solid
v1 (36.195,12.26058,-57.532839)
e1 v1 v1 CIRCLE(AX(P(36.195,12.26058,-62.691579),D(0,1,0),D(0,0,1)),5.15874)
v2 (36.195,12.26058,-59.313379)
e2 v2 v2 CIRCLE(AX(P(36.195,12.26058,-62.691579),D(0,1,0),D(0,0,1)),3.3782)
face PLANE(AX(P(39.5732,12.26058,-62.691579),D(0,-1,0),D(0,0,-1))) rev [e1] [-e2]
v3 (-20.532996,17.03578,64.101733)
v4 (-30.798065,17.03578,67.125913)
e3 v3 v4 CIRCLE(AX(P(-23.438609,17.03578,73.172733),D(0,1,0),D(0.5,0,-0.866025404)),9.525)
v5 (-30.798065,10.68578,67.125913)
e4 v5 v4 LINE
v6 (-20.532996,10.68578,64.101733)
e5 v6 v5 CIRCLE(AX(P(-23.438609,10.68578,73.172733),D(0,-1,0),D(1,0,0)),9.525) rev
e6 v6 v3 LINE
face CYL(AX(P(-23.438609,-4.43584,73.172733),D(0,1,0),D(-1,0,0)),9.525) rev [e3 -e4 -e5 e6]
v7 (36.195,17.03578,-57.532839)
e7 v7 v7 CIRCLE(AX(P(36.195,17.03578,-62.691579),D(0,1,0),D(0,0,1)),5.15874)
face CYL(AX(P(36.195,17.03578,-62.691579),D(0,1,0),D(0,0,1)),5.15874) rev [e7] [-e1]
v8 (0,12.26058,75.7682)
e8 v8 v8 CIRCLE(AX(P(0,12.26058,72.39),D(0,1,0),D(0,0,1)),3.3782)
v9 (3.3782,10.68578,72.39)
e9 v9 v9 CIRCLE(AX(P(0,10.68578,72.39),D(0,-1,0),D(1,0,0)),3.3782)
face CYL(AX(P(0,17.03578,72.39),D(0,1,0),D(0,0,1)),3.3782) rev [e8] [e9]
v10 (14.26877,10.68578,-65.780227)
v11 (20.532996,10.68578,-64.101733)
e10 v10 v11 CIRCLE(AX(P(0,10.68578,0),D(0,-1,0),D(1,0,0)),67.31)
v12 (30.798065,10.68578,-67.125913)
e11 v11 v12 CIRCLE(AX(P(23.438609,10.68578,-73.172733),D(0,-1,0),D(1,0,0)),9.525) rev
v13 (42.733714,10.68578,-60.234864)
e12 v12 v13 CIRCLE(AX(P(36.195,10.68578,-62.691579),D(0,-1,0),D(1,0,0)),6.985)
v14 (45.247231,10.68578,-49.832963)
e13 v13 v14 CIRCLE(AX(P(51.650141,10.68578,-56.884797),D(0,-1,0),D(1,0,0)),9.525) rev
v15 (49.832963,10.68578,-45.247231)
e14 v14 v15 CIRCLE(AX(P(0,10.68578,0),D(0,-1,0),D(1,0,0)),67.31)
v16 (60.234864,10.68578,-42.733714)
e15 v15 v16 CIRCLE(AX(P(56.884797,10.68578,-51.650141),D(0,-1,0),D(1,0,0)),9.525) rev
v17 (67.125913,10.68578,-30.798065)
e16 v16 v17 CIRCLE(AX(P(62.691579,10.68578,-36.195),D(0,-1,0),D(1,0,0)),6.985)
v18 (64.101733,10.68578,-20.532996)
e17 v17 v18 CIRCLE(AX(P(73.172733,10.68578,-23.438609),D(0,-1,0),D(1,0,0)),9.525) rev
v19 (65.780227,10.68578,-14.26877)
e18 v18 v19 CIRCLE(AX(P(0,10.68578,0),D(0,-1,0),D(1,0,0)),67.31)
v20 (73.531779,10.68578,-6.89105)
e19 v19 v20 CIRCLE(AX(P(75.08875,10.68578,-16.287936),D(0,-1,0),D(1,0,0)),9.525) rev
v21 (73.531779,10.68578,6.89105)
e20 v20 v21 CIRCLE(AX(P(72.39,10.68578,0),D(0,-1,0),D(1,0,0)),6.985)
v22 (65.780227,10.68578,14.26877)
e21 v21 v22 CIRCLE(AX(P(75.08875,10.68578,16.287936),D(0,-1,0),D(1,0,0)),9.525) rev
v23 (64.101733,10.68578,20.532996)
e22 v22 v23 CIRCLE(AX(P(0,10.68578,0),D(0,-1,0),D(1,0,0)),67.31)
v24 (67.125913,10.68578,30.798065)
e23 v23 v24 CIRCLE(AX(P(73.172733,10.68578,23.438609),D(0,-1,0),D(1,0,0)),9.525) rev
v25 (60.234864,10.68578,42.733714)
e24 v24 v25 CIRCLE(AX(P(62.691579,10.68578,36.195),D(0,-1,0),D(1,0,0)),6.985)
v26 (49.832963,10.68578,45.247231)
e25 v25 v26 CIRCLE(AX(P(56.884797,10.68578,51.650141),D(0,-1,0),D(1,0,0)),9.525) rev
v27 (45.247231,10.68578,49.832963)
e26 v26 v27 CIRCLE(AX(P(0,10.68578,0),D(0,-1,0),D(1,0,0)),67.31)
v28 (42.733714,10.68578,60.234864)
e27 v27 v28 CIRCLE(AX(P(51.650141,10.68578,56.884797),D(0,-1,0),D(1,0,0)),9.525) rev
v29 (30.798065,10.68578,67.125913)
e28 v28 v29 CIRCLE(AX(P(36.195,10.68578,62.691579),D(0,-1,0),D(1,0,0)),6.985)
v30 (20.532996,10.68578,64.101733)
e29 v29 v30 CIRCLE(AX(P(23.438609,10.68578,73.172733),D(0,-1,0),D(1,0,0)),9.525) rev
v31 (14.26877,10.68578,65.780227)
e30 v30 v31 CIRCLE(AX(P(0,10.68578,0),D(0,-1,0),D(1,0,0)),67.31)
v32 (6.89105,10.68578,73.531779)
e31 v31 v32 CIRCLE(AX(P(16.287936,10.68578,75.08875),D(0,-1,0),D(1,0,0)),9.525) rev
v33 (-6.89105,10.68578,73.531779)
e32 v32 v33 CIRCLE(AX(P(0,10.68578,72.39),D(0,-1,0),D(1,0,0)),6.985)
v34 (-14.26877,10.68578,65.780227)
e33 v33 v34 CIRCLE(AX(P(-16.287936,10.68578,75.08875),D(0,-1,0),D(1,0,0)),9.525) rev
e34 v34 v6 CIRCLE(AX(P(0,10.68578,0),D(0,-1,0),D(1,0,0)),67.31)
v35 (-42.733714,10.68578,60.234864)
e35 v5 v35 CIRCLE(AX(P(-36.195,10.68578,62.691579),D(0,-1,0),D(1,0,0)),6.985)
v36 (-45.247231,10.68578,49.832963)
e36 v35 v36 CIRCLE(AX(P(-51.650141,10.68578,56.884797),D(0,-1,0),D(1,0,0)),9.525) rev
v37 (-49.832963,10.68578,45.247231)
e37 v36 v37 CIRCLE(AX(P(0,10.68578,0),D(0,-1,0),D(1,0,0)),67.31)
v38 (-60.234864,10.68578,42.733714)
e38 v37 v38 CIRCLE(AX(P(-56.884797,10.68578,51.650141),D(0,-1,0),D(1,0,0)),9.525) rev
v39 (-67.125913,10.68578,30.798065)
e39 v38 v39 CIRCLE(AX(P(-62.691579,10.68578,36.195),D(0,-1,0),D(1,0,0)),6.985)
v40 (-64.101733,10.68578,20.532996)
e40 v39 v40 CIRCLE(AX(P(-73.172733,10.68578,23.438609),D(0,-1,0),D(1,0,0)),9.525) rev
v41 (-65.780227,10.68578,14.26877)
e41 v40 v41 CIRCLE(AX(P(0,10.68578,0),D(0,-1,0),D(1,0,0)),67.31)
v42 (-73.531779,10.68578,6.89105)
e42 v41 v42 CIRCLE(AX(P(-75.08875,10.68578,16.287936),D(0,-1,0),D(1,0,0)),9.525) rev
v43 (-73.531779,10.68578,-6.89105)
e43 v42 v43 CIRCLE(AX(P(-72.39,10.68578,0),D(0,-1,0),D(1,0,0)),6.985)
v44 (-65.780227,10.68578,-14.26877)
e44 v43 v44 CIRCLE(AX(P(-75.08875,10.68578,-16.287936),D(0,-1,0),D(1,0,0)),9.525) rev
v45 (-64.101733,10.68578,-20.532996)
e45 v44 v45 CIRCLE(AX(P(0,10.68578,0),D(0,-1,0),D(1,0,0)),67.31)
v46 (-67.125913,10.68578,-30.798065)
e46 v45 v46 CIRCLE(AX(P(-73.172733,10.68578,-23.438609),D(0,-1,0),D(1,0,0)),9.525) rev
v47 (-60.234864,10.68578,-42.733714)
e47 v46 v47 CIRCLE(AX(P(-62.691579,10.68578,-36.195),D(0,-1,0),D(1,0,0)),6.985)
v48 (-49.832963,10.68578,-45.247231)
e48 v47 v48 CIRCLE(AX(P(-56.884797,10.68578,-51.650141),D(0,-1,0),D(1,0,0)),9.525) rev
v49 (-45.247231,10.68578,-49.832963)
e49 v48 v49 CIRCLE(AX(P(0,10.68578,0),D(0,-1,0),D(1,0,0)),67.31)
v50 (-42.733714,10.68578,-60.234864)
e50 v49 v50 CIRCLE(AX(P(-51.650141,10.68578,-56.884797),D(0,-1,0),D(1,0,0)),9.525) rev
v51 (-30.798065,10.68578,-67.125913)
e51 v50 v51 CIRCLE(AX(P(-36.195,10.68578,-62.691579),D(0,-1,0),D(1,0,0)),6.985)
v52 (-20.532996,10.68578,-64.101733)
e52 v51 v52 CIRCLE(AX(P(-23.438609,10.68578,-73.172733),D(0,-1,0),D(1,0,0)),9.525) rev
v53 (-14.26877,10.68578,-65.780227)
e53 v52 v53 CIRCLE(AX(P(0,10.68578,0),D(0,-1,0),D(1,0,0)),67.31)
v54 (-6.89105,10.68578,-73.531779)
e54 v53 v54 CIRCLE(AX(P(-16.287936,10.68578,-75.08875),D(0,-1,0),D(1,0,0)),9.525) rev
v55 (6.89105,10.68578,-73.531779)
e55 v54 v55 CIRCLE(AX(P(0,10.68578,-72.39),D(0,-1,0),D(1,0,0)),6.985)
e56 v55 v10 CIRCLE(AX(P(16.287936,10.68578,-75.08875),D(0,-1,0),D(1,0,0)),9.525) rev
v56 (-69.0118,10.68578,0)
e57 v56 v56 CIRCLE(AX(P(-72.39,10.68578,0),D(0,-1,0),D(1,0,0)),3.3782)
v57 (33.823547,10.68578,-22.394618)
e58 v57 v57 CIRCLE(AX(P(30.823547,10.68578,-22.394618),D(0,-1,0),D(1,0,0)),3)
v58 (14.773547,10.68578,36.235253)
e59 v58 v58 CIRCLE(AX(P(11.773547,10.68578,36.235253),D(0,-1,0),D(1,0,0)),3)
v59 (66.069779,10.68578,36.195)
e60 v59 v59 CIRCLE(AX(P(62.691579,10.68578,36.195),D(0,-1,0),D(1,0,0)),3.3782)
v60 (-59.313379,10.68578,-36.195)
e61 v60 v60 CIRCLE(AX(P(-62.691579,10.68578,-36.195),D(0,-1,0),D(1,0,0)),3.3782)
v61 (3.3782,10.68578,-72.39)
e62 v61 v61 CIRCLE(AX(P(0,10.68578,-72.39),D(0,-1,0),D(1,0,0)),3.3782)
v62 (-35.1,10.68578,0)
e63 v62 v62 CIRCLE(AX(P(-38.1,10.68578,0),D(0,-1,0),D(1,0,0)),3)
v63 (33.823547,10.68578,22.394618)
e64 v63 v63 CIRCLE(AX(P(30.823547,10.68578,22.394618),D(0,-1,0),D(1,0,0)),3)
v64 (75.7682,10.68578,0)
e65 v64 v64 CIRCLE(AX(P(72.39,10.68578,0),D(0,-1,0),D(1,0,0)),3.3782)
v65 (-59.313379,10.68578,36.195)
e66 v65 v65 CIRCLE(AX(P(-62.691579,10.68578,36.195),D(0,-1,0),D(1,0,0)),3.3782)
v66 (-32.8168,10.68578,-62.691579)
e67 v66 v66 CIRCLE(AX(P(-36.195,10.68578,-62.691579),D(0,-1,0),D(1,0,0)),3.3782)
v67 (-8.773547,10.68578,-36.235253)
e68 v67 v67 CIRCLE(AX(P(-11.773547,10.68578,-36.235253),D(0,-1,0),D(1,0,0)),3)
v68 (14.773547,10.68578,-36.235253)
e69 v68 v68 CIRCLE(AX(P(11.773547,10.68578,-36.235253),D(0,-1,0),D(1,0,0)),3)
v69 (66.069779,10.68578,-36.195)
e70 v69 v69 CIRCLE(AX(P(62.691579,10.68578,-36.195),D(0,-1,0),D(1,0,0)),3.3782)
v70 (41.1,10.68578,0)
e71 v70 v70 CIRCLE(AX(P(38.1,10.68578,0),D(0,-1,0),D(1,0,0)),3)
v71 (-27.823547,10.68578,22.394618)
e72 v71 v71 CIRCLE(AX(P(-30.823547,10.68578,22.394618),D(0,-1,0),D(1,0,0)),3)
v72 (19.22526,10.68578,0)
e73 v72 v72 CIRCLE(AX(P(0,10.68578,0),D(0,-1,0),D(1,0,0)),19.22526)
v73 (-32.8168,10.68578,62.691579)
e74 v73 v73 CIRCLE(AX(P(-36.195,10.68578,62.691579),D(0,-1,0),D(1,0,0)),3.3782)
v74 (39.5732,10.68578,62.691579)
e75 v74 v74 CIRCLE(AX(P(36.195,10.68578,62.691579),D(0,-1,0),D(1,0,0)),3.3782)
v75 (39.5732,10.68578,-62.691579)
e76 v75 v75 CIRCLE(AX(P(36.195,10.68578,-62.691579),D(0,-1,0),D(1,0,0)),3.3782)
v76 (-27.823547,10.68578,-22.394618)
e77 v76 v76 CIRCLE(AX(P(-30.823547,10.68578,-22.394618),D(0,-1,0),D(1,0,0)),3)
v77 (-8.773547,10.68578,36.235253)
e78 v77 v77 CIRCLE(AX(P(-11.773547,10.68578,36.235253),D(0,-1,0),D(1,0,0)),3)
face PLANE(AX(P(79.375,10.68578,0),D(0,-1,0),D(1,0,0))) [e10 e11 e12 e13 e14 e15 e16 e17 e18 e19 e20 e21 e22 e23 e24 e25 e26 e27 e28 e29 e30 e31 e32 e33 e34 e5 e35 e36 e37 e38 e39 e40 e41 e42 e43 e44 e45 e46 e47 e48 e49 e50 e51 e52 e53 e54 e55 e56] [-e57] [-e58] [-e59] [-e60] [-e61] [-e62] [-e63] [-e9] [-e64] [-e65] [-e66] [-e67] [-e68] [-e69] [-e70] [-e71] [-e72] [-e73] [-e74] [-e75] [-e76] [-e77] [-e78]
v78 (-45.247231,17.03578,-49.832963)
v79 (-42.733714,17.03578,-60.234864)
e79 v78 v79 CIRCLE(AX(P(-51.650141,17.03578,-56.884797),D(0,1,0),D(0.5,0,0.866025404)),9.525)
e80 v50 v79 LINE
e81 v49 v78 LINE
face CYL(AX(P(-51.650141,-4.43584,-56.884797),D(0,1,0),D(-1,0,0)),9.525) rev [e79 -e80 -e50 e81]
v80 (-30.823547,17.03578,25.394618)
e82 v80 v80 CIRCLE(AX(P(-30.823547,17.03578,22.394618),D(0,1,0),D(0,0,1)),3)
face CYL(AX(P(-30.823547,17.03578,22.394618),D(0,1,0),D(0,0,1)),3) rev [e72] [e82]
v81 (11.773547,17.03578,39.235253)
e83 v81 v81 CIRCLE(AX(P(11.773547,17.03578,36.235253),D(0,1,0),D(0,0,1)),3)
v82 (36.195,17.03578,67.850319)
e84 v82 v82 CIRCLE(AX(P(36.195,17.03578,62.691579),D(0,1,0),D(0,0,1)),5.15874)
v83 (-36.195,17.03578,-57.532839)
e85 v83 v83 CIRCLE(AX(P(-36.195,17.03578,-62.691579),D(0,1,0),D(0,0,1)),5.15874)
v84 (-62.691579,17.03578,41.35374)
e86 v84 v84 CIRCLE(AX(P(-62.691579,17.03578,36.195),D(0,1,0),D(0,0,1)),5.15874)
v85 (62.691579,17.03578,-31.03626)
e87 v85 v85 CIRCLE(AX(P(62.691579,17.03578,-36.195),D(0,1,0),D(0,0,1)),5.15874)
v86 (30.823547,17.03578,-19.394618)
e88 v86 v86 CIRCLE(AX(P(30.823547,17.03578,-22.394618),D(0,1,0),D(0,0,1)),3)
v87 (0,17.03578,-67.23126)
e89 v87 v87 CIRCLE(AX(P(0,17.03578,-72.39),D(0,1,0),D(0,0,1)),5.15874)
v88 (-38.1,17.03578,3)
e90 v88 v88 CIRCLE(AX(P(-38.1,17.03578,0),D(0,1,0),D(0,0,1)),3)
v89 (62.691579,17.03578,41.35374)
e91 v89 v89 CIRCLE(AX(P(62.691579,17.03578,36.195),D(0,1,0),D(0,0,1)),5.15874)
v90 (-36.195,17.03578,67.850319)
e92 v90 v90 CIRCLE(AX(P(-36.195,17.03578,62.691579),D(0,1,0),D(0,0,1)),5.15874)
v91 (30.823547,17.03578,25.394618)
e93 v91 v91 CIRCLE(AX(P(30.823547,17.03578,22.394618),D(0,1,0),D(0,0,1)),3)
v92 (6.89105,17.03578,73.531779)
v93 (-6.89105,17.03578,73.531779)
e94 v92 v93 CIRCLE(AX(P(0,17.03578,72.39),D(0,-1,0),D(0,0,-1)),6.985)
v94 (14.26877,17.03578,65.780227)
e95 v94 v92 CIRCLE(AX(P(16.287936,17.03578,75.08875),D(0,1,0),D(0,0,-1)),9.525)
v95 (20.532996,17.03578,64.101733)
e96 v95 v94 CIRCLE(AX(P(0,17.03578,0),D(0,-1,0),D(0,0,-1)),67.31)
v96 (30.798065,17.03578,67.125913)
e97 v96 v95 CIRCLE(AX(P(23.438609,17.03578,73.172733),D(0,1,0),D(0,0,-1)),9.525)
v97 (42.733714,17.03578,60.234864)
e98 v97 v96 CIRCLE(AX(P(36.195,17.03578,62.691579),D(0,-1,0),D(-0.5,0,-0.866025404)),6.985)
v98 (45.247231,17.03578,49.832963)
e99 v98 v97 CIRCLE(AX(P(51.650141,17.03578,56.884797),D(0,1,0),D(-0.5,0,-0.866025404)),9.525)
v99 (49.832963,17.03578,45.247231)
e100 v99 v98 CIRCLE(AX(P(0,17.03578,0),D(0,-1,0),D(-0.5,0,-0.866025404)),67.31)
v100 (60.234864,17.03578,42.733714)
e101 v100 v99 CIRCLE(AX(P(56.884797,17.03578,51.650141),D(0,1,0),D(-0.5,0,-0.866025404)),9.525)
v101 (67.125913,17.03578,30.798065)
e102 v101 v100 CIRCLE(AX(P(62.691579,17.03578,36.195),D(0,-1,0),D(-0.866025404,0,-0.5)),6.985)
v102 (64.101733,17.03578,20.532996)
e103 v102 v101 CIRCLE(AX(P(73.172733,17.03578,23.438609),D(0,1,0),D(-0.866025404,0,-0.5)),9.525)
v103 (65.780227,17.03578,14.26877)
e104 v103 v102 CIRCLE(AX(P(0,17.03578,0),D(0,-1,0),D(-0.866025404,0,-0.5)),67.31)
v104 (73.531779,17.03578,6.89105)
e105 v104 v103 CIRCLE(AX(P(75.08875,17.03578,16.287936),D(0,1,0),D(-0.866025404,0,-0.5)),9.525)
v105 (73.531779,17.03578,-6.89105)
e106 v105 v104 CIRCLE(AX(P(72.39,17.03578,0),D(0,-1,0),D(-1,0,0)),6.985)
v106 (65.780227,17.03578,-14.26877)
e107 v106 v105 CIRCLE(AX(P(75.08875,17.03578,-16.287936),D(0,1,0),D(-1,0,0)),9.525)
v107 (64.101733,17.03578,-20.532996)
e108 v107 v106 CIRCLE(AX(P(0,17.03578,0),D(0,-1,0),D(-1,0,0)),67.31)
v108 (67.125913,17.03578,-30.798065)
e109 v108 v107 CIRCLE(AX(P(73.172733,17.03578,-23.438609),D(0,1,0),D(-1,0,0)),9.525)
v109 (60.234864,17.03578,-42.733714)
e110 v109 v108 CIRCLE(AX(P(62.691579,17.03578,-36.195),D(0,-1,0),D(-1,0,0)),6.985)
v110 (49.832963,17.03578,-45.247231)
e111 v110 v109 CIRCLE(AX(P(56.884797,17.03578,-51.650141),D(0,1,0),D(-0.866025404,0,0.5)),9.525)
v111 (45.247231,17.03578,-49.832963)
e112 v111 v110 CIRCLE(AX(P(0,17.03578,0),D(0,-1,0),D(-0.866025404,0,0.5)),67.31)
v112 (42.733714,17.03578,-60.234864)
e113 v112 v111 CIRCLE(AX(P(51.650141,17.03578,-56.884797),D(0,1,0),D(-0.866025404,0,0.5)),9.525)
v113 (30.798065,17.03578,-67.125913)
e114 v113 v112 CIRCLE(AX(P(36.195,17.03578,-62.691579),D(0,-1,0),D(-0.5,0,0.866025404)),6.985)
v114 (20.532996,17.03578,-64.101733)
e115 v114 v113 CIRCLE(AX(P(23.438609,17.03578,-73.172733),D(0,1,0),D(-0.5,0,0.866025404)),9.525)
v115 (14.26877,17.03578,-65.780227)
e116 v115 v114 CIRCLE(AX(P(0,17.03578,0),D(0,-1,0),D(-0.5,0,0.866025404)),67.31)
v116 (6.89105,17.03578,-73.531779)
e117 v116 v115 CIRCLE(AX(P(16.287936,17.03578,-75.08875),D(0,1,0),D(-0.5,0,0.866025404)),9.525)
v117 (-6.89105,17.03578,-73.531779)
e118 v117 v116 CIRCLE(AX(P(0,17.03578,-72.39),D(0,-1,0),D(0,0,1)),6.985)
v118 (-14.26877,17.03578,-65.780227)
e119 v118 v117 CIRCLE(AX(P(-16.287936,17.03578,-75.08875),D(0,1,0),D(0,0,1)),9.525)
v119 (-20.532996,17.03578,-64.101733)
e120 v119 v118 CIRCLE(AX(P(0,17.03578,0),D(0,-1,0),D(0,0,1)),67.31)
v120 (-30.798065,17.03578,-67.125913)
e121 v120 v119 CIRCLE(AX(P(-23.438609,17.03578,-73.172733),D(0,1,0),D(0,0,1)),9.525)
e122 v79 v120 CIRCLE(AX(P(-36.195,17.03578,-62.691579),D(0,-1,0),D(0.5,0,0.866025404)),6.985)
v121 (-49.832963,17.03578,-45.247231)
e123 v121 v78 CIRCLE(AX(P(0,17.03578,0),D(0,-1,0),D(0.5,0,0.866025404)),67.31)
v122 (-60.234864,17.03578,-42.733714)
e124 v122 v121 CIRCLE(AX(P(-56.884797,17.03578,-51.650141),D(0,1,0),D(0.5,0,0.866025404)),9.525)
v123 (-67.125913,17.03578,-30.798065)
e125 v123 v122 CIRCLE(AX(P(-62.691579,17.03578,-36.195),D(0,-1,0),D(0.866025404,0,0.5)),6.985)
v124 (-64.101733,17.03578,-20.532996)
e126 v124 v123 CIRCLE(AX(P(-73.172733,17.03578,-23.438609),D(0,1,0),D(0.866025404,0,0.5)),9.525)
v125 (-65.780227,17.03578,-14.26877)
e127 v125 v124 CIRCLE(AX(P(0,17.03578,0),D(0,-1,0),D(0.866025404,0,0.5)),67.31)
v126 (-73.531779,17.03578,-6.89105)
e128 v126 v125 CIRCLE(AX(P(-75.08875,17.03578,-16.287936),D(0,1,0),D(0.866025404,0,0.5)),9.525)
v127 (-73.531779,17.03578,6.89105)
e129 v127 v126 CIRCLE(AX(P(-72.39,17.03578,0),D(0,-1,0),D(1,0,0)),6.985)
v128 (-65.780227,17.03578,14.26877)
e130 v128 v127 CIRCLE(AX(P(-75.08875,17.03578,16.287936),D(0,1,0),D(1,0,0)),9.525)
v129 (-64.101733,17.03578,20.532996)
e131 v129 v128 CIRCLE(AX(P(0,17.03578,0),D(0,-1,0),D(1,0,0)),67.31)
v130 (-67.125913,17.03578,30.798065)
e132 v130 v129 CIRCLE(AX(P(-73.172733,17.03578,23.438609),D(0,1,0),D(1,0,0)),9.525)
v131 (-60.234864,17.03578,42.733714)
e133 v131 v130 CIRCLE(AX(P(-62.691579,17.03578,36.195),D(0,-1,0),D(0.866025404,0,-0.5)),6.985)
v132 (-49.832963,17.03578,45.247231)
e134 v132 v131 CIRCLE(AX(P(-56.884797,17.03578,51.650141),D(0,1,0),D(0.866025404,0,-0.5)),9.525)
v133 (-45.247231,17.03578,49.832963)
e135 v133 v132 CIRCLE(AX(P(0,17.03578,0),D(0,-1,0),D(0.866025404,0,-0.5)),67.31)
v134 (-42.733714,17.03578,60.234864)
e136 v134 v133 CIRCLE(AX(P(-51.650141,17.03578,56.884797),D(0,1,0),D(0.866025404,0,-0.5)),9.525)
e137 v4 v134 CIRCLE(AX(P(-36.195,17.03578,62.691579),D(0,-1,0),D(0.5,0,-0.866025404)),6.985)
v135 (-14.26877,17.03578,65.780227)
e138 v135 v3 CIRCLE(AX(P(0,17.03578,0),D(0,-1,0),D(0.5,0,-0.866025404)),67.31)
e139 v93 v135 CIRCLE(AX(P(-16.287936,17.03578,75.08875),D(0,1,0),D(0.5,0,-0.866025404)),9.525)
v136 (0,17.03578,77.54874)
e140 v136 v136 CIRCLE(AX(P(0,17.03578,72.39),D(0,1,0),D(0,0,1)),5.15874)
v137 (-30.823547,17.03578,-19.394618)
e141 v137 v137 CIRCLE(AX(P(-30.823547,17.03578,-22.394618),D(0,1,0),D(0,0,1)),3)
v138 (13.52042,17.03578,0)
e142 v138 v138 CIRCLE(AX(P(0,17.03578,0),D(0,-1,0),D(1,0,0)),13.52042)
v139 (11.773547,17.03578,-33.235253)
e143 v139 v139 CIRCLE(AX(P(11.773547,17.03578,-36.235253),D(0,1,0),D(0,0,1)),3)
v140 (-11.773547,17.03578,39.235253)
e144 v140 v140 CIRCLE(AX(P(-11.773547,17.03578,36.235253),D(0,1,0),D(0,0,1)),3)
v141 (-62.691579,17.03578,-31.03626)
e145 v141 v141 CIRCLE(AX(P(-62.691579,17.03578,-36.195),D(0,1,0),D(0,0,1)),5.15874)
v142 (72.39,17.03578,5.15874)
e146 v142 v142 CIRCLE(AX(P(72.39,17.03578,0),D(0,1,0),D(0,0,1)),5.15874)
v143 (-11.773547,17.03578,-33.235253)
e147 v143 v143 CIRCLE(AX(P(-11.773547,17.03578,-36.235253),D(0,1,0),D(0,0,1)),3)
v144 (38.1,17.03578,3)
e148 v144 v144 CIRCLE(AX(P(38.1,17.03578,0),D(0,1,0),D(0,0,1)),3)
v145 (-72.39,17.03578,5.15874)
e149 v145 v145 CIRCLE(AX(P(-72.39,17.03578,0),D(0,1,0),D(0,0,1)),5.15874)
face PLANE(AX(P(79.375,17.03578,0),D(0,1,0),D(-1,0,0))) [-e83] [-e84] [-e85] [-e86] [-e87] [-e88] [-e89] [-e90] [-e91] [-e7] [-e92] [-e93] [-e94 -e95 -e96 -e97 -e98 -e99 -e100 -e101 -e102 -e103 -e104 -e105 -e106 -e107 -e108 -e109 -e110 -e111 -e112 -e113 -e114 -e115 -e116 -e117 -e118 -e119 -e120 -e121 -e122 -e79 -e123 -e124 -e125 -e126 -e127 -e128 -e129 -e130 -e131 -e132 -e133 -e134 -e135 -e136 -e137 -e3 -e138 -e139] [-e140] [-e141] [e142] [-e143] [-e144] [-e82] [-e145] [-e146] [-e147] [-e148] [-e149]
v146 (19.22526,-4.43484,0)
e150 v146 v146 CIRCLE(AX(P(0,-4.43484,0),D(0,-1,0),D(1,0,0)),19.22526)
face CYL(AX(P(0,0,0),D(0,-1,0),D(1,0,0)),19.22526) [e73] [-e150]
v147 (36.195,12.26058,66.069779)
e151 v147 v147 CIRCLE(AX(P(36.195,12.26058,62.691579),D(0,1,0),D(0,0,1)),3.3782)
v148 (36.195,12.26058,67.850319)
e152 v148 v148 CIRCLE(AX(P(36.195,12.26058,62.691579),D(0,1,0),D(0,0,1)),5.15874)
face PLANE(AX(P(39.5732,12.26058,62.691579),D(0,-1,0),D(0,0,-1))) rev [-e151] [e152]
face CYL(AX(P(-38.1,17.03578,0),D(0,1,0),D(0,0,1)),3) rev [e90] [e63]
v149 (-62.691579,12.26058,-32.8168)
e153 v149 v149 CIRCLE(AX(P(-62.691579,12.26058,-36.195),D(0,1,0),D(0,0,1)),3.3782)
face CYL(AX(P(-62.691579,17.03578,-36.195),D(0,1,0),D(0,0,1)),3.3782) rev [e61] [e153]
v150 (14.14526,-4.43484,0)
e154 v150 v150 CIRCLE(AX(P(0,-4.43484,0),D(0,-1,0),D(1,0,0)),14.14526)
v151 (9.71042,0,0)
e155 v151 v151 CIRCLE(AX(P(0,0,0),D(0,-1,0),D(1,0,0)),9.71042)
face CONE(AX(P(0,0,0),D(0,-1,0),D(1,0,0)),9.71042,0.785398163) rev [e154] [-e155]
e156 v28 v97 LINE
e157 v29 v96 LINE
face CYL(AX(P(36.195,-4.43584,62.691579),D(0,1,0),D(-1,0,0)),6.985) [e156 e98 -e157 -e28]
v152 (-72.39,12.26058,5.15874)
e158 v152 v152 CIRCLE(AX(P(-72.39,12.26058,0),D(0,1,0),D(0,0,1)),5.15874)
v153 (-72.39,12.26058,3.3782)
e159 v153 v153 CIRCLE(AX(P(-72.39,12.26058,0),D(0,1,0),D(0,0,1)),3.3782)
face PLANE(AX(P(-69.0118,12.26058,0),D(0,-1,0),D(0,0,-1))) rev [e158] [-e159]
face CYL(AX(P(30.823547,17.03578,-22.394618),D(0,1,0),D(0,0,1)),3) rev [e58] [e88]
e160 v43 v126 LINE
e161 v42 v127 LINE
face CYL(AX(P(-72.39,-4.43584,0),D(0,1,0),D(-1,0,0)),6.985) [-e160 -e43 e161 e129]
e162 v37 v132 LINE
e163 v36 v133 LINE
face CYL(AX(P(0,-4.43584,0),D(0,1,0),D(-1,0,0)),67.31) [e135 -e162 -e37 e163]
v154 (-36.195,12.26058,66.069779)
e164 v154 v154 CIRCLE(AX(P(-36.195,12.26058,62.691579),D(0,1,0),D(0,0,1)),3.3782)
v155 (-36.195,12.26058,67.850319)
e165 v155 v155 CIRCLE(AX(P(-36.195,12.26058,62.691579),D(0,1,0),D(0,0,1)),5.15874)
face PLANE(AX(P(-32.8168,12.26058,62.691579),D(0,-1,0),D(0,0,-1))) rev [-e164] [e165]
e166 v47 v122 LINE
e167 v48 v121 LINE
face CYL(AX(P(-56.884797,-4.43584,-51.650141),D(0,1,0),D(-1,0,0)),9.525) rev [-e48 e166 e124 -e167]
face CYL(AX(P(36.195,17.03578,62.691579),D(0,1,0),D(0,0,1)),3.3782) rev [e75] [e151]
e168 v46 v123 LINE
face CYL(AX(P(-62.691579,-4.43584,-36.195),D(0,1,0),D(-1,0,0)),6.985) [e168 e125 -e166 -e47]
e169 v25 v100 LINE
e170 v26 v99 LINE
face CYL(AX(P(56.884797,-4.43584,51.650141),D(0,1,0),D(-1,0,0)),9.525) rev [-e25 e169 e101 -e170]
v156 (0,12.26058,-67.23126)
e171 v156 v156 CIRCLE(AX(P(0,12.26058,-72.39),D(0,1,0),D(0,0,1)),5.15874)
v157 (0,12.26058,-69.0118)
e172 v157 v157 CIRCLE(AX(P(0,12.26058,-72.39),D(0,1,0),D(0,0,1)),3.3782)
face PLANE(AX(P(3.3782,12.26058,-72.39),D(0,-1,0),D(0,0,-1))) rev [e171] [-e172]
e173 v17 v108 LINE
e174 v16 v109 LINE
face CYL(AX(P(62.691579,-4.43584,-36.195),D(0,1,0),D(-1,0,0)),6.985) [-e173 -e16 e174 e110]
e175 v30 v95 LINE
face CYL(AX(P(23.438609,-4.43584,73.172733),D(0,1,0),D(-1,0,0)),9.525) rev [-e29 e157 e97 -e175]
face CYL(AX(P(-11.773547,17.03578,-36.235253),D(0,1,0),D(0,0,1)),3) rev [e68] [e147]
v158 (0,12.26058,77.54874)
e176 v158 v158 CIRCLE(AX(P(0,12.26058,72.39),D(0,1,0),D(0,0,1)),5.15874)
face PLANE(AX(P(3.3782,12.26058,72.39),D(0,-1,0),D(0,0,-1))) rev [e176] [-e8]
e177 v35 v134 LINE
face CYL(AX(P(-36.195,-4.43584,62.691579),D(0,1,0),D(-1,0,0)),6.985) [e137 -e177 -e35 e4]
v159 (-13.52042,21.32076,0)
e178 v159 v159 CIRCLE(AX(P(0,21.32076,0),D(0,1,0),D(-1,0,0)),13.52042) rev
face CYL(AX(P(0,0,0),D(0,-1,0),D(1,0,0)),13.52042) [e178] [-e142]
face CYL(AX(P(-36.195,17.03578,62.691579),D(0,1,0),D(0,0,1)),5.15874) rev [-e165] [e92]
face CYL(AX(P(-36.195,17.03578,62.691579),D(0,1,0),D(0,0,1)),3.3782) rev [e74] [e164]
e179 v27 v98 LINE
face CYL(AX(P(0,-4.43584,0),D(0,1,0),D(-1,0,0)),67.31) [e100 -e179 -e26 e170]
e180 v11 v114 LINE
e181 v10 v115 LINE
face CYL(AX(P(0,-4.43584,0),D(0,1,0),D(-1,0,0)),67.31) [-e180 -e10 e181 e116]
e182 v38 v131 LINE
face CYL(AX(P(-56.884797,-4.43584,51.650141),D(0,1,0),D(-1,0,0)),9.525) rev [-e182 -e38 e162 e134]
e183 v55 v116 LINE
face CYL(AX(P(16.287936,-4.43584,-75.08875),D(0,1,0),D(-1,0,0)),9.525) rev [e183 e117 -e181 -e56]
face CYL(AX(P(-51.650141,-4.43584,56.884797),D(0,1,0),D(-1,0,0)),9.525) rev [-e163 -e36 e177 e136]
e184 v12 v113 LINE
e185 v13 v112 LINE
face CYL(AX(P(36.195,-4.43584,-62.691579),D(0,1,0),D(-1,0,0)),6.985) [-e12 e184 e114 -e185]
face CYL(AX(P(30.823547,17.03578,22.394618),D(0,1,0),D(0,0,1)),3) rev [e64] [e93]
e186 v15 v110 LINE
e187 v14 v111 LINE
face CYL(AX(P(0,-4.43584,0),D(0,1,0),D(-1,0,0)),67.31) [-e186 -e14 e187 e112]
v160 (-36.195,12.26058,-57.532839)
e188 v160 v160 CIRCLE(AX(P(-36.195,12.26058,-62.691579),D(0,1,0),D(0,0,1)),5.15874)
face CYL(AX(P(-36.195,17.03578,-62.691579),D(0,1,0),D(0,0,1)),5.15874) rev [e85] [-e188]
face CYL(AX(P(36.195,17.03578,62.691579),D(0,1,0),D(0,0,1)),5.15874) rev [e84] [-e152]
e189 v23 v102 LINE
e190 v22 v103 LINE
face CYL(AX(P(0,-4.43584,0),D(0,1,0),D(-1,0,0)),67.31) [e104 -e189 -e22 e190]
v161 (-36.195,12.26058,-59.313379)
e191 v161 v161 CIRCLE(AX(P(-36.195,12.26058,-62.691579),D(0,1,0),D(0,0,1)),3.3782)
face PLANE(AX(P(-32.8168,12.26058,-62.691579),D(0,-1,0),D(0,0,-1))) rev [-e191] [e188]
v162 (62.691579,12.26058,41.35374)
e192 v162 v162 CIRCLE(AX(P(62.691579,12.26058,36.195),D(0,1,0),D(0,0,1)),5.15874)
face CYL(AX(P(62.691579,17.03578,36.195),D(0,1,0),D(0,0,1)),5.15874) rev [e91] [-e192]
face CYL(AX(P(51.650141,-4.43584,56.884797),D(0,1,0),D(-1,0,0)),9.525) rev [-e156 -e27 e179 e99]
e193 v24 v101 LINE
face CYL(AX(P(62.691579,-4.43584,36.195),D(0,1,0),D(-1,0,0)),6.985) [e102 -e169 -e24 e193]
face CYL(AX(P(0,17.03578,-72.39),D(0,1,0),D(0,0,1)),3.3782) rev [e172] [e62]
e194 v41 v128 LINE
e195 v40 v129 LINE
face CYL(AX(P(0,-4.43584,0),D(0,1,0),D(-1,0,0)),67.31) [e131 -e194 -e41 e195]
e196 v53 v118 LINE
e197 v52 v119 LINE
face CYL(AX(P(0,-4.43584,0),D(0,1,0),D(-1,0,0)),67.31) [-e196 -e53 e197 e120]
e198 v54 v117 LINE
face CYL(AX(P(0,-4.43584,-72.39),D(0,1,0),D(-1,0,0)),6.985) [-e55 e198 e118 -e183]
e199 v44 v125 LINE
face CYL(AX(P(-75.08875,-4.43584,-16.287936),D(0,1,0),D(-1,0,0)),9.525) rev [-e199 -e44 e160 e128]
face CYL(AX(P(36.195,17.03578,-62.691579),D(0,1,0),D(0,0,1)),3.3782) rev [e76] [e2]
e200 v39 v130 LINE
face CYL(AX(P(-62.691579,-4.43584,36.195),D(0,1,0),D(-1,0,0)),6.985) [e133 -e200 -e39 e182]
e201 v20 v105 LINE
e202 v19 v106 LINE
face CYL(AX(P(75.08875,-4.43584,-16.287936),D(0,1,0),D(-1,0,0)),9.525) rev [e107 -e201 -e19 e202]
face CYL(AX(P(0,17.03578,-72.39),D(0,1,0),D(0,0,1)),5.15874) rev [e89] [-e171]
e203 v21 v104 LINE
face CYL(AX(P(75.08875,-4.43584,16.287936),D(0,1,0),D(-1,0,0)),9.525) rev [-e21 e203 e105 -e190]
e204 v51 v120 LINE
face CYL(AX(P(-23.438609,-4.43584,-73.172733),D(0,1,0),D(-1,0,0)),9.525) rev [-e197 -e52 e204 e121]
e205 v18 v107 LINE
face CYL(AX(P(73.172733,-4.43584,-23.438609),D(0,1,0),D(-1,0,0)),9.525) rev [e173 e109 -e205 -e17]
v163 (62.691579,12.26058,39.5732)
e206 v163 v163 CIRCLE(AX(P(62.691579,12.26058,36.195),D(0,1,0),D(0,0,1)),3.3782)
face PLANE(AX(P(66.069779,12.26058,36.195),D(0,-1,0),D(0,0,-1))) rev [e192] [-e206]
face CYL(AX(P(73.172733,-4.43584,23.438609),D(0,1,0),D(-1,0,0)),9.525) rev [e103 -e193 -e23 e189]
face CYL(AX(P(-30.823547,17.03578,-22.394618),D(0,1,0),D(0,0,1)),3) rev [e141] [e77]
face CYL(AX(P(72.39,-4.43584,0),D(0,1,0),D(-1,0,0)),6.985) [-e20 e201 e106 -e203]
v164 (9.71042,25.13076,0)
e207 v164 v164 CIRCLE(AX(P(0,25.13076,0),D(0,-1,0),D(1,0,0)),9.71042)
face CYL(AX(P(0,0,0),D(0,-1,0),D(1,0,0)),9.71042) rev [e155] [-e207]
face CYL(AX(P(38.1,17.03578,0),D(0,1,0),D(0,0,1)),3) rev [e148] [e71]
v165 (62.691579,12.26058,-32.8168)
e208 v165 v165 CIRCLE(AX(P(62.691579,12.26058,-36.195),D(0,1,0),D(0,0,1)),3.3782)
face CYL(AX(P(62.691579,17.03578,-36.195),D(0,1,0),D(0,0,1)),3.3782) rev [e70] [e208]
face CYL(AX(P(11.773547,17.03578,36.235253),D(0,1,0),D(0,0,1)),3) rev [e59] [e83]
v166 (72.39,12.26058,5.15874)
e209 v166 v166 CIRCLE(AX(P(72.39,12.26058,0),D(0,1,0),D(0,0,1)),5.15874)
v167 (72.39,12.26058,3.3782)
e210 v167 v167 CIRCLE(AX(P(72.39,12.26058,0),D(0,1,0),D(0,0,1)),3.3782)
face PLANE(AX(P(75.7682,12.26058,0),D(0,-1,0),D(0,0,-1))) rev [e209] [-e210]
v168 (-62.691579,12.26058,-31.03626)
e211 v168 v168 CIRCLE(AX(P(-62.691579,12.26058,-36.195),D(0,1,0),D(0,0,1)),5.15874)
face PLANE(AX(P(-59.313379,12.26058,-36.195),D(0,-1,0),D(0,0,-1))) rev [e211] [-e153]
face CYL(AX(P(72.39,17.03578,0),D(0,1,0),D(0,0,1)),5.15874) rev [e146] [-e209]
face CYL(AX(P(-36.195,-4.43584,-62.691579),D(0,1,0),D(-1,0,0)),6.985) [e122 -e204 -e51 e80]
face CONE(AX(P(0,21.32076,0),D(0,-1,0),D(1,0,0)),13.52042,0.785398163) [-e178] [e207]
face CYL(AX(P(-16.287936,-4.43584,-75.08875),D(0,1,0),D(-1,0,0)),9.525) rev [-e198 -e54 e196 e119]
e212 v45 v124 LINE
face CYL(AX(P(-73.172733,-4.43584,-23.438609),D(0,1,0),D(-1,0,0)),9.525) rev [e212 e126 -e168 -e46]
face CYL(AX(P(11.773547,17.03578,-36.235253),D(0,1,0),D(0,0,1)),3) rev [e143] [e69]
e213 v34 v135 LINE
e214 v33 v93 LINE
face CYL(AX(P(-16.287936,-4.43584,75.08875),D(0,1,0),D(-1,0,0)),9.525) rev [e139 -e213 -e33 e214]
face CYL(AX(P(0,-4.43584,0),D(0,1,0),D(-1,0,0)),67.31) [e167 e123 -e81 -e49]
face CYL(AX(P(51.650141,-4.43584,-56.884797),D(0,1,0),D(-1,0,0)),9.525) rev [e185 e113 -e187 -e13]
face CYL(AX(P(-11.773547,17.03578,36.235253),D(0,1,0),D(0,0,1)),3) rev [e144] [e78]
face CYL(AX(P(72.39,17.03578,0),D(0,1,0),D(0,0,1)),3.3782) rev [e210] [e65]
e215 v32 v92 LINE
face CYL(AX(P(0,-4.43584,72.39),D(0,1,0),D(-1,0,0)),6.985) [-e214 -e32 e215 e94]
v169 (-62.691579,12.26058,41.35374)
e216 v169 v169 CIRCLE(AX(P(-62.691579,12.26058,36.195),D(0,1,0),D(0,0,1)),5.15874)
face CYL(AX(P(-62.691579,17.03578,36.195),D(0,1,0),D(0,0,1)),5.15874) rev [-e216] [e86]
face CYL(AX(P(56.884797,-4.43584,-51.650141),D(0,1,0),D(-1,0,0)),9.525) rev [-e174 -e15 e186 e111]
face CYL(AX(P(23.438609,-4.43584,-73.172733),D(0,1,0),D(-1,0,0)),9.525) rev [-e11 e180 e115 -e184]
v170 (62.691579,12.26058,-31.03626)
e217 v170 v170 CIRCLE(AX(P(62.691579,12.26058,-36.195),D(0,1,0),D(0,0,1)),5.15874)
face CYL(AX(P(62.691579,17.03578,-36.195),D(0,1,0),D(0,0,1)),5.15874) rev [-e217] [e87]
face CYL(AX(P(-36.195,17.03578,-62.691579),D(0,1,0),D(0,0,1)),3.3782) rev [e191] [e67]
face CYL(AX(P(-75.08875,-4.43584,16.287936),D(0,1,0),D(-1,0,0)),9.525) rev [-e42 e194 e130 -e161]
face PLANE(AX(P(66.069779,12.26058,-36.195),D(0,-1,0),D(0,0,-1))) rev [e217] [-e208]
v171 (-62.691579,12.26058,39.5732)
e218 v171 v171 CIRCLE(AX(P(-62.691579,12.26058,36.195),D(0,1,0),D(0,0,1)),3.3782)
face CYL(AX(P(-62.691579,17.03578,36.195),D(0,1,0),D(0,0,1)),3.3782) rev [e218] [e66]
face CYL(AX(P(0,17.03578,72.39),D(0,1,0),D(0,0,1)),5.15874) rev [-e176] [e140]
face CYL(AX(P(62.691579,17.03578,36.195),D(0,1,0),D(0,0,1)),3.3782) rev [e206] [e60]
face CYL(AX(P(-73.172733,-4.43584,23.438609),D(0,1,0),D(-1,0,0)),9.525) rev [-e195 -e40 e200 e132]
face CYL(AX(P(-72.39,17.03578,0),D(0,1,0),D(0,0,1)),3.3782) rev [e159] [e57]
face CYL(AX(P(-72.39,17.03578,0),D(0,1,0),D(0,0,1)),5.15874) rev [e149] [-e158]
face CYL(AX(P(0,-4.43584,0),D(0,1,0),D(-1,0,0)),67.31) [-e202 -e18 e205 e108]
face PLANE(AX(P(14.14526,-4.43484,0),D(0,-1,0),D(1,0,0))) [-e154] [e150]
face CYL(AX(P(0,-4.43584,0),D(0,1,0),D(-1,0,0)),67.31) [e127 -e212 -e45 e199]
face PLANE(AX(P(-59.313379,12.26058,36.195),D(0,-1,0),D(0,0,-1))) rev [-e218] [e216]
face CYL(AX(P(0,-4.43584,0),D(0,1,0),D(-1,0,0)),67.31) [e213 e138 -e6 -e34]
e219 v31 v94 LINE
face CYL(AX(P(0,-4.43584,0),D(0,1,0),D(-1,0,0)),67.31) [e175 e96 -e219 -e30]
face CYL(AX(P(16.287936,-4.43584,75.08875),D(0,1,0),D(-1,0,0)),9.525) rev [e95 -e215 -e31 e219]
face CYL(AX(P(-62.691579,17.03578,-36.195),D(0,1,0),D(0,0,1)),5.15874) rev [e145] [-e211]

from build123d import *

# Parameters (mm, degrees)
CHAMFER1_SIZE                                    = 3.81
HOLE2_D                                          = 6
CIRPATTERN2_COUNT                                = 10
CBORE_FOR_1_4_SOCKET_SHOULDER_SCREW1_D           = 6.7564
CBORE_FOR_1_4_SOCKET_SHOULDER_SCREW1_CBORE_D     = 10.31748
CBORE_FOR_1_4_SOCKET_SHOULDER_SCREW1_CBORE_DEPTH = 4.7752
CIRPATTERN4_COUNT                                = 12
CUT_EXTRUDE3_REACH                               = 116.288
CIRPATTERN5_COUNT                                = 12


with BuildPart() as part:
    # Sketch1 → Revolve1 (revolve)
    with BuildSketch(Plane.XY):
        Polygon((79.375, 10.68578), (79.375, 17.03578), (13.52042, 17.03578), (13.52042, 25.13076), (9.71042, 25.13076), (9.71042, 0), (14.14526, -4.43484), (19.22526, -4.43484), (19.22526, 10.68578), align=None)
    revolve(axis=Axis((0, 0, 0), (0, 1, 0)))

    # Chamfer1
    chamfer1_edges = [part.edges().sort_by_distance(p)[0] for p in [
        (-13.52042, 25.13076, 0),
    ]]
    chamfer(chamfer1_edges, length=CHAMFER1_SIZE - 0.0001)  # a hair under: the kernel refuses the full size

    # Hole2 (through all)
    with Locations(Plane(origin=(0, 17.03578, 0), x_dir=(1, 0, 0), z_dir=(0, 1, 0))):
        with Locations((38.1, 0)):
            hole2 = Hole(HOLE2_D / 2)

    # CirPattern2: Hole2 ×10 about axis
    cirpattern2_axis = Axis((0, 0, 0), (0, 1, 0))
    for i in range(1, CIRPATTERN2_COUNT):
        add(hole2.rotate(cirpattern2_axis, i * 360 / CIRPATTERN2_COUNT), mode=Mode.SUBTRACT)

    # CBORE for 1/4 Socket Shoulder Screw1 (through all)
    with Locations(Plane(origin=(0, 17.03578, 0), x_dir=(1, 0, 0), z_dir=(0, 1, 0))):
        with Locations((72.39, 0)):
            cbore_for_1_4_socket_shoulder_screw1 = CounterBoreHole(CBORE_FOR_1_4_SOCKET_SHOULDER_SCREW1_D / 2, CBORE_FOR_1_4_SOCKET_SHOULDER_SCREW1_CBORE_D / 2, CBORE_FOR_1_4_SOCKET_SHOULDER_SCREW1_CBORE_DEPTH)

    # CirPattern4: CBORE for 1/4 Socket Shoulder Screw1 ×12 about axis
    cirpattern4_axis = Axis((0, 0, 0), (0, 1, 0))
    for i in range(1, CIRPATTERN4_COUNT):
        add(cbore_for_1_4_socket_shoulder_screw1.rotate(cirpattern4_axis, i * 360 / CIRPATTERN4_COUNT), mode=Mode.SUBTRACT)

    # Sketch17 → Cut-Extrude3 (cut, up to next)
    with BuildSketch(Plane(origin=(0, 17.03578, 0), x_dir=(1, 0, 0), z_dir=(0, 1, 0)), mode=Mode.PRIVATE) as cut_extrude3_sk1:
        with BuildLine():
            ThreePointArc((79.375, 0), (77.717548697, 4.517460557), (73.531778846, 6.891049707))
            ThreePointArc((73.531778846, 6.891049707), (68.521982999, 9.388428721), (65.780227273, 14.268770092))
            ThreePointArc((65.780227273, 14.268770092), (65.016467368, 17.421109926), (64.101732931, 20.532996256))
            ThreePointArc((64.101732931, 20.532996256), (64.035992356, 26.130373726), (67.12591332, 30.798065318))
            ThreePointArc((67.12591332, 30.798065318), (69.56410177, 34.946538746), (68.740766425, 39.6875))
            ThreePointArc((68.740766425, 39.6875), (76.670362462, 20.543761705), (79.375, 0))
        make_face()
    cut_extrude3_tool1 = extrude(cut_extrude3_sk1.sketch, amount=-CUT_EXTRUDE3_REACH, mode=Mode.PRIVATE) & part.part
    cut_extrude3 = cut_extrude3_tool1.solids().sort_by_distance((71.346501, 17.03578, -19.117237))[0]
    add(cut_extrude3, mode=Mode.SUBTRACT)

    # CirPattern5: Cut-Extrude3 ×12 about axis
    cirpattern5_axis = Axis((0, 0, 0), (0, 1, 0))
    for i in range(1, CIRPATTERN5_COUNT):
        add(cut_extrude3.rotate(cirpattern5_axis, i * 360 / CIRPATTERN5_COUNT), mode=Mode.SUBTRACT)


solid = part.part
